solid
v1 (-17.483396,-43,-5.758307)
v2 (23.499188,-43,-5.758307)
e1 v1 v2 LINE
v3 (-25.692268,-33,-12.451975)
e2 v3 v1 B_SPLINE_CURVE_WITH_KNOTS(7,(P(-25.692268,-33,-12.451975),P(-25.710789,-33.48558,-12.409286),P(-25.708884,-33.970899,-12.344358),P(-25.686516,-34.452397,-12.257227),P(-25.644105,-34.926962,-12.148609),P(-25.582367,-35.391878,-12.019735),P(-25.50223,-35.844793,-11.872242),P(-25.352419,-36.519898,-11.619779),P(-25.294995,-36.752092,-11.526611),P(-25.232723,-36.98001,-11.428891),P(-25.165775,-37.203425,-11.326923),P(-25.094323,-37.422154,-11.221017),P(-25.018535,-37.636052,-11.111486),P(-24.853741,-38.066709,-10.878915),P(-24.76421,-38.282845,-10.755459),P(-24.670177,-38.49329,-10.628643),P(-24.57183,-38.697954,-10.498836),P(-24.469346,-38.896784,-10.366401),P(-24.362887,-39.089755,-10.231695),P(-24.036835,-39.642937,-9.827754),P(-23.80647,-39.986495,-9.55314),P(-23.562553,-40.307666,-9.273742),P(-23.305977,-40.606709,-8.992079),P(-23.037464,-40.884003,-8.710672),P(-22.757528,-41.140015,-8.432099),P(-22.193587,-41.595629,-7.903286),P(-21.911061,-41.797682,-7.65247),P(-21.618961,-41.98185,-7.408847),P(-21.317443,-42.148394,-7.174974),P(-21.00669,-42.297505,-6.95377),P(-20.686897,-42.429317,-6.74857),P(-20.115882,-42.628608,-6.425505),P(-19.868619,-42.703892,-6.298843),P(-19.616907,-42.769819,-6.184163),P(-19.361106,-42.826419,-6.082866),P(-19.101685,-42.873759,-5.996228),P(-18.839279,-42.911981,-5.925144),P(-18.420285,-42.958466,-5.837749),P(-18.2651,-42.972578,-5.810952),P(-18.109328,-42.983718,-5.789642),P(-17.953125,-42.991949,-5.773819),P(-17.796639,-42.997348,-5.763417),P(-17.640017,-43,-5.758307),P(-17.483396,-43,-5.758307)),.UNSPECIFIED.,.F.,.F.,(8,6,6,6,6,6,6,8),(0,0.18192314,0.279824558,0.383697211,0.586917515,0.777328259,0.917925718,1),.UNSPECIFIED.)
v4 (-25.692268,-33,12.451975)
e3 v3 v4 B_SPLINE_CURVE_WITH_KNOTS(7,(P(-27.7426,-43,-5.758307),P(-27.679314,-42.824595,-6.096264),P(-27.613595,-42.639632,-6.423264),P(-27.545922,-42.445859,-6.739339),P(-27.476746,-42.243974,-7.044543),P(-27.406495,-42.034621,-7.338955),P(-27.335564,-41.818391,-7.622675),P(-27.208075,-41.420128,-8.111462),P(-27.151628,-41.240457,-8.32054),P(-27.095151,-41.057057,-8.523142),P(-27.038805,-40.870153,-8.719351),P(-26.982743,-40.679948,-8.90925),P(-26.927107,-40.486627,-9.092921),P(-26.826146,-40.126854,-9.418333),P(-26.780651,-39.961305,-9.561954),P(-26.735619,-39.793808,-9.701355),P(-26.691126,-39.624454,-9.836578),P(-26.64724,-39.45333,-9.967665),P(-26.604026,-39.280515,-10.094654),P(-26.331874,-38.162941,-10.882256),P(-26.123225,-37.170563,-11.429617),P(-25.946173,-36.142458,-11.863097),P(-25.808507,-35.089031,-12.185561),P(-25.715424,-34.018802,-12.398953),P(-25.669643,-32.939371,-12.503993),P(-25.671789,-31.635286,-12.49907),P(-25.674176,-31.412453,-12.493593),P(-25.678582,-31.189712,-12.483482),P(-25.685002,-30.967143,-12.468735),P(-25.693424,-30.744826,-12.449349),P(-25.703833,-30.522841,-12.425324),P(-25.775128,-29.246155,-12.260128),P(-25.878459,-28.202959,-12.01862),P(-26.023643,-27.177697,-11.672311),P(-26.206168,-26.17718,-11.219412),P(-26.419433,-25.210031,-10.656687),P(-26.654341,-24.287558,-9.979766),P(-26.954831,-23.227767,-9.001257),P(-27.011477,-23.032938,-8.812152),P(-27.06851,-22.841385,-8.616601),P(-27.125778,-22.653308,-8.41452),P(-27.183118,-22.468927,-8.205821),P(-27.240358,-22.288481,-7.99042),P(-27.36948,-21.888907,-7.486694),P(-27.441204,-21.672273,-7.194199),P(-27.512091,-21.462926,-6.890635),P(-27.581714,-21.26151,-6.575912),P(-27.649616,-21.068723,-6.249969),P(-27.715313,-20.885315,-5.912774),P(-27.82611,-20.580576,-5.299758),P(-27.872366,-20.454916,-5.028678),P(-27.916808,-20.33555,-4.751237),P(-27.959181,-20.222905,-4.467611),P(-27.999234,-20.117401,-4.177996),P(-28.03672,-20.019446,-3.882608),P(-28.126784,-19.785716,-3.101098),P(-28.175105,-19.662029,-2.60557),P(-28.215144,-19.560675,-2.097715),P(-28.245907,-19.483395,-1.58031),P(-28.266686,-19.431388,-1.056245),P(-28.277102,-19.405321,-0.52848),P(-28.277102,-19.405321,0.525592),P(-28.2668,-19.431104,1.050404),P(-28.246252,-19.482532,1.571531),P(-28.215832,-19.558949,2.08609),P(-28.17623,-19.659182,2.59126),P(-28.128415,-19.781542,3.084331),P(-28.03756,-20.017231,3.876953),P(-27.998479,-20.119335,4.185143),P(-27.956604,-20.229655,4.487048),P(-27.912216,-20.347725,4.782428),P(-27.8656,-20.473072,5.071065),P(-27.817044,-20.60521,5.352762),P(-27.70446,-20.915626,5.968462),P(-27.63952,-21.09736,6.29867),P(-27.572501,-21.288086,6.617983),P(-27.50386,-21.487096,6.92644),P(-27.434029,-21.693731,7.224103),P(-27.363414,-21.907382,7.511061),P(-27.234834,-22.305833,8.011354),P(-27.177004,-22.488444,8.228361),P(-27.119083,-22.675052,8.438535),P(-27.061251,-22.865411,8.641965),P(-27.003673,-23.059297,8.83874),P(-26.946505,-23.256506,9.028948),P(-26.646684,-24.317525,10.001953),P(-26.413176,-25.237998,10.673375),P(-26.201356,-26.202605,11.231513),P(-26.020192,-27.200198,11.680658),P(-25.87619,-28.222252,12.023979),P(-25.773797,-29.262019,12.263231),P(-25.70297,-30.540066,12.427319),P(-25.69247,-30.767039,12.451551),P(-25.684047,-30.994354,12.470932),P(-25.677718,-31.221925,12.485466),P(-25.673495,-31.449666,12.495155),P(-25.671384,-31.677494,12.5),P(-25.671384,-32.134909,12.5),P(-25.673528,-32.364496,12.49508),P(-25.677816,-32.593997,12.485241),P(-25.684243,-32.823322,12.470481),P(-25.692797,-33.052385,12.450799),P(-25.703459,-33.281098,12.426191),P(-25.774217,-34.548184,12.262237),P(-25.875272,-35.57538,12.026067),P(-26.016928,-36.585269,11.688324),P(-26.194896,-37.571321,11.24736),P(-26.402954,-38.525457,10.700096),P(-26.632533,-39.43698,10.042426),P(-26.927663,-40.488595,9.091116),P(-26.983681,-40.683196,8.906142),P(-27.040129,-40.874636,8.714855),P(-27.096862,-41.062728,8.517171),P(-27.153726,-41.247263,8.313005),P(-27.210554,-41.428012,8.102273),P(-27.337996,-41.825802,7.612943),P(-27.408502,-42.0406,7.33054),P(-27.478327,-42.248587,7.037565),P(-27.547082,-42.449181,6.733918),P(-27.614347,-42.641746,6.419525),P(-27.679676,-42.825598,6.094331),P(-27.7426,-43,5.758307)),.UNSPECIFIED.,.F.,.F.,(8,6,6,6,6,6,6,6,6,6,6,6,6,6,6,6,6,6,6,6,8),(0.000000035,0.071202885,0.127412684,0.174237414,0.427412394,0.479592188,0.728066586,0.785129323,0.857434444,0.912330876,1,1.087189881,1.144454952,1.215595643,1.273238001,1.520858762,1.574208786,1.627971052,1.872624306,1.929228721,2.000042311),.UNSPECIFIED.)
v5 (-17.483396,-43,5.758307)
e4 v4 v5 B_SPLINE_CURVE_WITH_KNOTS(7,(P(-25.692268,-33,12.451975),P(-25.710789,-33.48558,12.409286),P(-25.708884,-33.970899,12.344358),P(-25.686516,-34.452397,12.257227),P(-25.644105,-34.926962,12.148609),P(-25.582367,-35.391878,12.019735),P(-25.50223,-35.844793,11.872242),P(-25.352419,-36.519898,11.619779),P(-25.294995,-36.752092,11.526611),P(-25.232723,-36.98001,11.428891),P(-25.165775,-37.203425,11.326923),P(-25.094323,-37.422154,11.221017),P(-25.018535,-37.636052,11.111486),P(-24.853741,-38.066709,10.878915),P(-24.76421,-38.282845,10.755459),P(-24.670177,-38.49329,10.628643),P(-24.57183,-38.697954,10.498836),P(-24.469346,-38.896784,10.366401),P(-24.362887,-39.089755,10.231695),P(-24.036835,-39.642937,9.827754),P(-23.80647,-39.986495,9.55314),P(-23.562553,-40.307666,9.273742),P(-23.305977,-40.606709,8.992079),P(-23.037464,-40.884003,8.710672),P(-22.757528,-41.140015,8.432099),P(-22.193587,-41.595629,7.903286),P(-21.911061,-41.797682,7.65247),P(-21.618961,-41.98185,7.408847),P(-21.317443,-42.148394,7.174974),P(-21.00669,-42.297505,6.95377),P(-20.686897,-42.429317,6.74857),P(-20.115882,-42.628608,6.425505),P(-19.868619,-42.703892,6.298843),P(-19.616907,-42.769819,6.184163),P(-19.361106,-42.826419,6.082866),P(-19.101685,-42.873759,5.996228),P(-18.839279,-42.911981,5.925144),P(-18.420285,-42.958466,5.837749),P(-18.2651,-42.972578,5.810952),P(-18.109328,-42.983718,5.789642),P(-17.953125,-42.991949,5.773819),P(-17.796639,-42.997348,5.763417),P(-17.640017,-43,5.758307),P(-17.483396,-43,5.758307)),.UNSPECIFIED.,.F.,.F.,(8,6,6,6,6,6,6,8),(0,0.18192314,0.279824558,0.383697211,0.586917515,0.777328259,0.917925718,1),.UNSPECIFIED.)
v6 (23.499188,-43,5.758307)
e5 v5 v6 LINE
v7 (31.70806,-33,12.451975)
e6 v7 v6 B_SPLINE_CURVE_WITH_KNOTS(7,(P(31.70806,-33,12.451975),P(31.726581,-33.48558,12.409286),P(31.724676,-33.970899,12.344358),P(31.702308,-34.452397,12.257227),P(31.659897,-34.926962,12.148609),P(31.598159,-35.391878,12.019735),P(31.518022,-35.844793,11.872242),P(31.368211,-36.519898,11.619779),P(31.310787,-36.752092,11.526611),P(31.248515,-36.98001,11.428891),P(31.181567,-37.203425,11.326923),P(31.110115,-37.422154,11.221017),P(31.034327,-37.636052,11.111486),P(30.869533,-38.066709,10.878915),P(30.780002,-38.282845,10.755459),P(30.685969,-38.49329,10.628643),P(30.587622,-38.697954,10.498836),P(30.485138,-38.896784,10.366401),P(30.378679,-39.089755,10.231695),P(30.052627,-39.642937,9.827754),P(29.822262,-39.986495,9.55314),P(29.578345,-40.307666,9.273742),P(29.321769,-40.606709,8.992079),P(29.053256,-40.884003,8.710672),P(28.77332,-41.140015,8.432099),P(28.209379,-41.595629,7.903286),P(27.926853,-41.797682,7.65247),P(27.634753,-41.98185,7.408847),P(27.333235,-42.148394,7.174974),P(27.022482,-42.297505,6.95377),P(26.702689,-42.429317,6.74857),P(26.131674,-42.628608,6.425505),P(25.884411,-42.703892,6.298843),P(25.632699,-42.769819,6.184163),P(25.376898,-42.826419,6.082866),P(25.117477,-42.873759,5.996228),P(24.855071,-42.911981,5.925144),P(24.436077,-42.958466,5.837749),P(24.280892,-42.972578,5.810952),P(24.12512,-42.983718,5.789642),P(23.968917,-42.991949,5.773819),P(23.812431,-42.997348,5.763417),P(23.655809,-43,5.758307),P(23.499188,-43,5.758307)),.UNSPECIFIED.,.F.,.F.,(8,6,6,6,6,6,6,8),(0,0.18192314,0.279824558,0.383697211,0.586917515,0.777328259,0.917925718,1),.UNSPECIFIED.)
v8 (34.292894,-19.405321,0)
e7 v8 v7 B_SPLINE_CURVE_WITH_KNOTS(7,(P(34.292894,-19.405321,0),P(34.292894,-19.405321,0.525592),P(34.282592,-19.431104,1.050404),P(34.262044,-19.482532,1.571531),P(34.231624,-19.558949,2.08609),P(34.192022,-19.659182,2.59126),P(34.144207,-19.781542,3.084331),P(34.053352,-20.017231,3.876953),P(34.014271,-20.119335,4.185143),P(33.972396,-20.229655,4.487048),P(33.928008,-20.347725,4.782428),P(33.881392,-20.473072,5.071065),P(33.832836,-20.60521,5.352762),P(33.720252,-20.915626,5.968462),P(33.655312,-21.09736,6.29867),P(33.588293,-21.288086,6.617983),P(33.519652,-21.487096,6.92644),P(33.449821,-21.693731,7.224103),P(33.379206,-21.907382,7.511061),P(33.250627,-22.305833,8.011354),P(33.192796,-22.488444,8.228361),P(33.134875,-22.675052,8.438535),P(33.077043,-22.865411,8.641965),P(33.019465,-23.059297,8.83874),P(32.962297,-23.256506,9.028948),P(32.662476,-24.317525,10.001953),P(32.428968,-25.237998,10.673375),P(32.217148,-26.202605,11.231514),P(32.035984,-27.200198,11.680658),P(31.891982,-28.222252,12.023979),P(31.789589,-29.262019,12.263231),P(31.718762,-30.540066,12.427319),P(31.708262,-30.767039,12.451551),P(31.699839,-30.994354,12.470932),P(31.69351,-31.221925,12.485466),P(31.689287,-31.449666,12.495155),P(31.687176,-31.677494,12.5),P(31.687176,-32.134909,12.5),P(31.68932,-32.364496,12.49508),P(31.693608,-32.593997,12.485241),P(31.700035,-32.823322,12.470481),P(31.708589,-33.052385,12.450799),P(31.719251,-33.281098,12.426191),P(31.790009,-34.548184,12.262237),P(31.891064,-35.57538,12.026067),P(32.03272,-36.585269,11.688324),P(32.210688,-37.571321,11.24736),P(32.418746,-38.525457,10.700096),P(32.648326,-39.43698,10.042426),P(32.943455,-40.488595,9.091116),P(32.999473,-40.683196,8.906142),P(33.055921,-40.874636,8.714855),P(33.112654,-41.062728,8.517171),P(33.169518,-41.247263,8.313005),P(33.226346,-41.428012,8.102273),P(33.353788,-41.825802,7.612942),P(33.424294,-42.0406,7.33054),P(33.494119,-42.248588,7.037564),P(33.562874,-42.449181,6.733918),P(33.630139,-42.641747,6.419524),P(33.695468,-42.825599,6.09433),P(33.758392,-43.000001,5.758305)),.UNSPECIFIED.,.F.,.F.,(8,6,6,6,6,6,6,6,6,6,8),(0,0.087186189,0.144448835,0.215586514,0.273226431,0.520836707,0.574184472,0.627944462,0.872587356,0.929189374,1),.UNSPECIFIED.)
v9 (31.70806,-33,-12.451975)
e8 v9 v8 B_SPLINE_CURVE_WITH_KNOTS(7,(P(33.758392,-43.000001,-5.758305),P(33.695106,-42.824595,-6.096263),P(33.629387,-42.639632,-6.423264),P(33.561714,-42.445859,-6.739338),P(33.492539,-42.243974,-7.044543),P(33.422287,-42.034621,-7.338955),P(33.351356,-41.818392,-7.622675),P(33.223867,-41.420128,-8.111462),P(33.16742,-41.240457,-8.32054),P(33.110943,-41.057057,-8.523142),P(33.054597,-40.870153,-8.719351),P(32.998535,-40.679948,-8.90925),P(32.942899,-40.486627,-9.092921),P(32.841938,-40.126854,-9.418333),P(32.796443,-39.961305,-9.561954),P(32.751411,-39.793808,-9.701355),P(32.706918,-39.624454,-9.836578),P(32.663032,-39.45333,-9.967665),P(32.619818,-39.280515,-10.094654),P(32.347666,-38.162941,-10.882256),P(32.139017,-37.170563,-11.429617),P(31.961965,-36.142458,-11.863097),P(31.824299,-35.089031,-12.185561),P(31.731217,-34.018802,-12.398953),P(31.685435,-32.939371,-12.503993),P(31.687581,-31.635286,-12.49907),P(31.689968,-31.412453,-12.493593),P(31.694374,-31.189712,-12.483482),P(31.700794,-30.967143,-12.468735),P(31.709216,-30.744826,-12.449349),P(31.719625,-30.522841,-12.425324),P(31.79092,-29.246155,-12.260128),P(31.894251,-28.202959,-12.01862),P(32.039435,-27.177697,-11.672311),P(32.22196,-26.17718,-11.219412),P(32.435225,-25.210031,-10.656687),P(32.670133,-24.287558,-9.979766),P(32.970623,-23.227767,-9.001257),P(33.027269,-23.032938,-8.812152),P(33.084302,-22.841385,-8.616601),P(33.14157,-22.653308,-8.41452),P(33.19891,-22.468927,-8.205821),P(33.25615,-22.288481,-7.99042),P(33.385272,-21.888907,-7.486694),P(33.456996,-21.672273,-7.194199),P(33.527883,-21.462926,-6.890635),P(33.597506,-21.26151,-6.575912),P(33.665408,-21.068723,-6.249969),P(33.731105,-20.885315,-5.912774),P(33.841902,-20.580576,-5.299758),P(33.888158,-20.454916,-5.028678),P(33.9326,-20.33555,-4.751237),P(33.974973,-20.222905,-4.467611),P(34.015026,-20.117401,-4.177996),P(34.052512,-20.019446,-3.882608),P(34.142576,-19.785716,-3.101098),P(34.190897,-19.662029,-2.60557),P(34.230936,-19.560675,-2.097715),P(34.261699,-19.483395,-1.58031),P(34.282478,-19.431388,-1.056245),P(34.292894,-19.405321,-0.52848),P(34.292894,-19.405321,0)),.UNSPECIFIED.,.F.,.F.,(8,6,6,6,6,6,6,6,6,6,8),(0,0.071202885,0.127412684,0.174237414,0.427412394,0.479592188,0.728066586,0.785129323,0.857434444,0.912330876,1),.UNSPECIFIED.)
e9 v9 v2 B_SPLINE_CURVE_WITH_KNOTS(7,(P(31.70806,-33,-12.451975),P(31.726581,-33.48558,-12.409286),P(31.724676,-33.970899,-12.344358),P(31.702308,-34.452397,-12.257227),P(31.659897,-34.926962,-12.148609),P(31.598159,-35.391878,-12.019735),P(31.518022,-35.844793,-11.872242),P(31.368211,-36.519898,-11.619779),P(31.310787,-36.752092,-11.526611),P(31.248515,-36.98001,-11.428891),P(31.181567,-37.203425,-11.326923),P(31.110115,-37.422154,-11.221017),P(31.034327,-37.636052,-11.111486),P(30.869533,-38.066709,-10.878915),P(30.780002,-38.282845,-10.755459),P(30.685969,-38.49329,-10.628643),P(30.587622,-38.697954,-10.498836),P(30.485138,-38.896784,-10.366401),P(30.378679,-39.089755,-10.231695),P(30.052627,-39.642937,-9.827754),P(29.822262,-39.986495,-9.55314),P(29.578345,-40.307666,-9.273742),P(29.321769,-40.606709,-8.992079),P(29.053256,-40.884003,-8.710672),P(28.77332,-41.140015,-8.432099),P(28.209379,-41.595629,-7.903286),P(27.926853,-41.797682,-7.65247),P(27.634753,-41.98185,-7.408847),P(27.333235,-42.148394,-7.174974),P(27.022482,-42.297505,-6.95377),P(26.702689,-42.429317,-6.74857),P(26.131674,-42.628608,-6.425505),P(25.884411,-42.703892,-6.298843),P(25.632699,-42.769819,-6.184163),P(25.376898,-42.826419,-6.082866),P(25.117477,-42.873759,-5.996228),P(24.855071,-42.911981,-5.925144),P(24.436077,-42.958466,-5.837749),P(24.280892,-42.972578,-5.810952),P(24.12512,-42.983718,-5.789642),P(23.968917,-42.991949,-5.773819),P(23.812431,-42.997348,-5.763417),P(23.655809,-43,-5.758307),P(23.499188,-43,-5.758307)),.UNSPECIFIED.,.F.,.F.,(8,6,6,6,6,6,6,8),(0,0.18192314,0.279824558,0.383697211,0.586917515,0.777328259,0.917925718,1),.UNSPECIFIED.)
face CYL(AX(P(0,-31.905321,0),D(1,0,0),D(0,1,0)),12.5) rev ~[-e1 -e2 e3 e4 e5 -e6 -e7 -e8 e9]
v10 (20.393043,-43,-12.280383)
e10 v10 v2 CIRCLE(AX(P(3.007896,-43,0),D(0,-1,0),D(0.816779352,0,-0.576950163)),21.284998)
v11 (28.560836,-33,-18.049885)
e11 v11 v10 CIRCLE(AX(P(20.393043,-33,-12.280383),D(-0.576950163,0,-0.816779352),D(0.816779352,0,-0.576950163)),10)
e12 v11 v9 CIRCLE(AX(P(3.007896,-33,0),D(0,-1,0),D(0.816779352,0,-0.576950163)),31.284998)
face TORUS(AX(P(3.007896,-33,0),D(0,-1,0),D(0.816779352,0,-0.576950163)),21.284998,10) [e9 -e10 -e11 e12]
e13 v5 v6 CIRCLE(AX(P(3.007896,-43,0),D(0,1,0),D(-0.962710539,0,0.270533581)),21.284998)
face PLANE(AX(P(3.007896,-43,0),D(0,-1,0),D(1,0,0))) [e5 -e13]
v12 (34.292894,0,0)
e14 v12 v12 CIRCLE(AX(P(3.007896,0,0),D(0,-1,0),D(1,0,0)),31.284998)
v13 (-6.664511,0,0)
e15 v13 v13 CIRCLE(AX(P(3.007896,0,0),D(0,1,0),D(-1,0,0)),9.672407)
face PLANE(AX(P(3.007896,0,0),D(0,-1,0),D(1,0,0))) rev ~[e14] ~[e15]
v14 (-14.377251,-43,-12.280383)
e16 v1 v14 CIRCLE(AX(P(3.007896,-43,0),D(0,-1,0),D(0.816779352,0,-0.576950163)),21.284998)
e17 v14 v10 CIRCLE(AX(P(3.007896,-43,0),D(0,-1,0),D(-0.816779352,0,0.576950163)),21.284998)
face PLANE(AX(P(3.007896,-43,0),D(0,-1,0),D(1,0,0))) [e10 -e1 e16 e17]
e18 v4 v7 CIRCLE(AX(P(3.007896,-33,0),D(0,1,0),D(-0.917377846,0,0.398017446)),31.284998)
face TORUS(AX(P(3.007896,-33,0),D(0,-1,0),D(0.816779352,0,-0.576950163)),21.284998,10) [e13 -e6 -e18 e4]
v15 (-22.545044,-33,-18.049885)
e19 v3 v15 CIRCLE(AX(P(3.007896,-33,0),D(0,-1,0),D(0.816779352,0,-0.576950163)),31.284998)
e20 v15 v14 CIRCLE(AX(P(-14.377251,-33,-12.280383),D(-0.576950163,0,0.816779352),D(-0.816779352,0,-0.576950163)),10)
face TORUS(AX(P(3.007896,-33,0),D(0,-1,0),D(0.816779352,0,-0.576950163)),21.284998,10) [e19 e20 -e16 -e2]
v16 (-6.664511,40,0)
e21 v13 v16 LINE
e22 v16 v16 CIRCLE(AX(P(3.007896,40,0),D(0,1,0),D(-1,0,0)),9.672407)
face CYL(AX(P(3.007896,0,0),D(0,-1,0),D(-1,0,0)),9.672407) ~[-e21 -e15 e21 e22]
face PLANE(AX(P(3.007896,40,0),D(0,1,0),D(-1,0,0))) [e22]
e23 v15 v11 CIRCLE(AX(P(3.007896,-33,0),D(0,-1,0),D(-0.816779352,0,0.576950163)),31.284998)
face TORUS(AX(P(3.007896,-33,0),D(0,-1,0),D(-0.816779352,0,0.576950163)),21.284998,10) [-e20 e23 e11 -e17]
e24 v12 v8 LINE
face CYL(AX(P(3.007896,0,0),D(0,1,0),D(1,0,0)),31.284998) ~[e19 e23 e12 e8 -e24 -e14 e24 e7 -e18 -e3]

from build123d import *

# Parameters (mm, degrees)
F0_R        = 31.2849976613
F1_DEPTH    = 43
F2_R        = 12.5
F3_DEPTH    = 40
F4_T3_ANGLE = 250.4726360275
F4_T6_ANGLE = 250.4726360275
F5_R        = 9.6724066991
F6_DEPTH    = 40


# Not quite as in the source:
# - a fillet or chamfer that OpenCascade refuses, or shapes differently, is made with other operations: its cross-section is extruded or revolved along the edge and cut away or added


with BuildPart() as f1:
    # F0 (on Front) → F1 (new body)
    with BuildSketch(Plane.XZ):
        with Locations((3.0078960117, 0)):
            Circle(F0_R)
    extrude(amount=F1_DEPTH)

    # F2 (on Right) → F3 (cut, symmetric)
    with BuildSketch(Plane.YZ):
        with Locations((-31.9053208832, 0)):
            Circle(F2_R)
    extrude(amount=F3_DEPTH, both=True, mode=Mode.SUBTRACT)

    # F4: fillet of radius 10 on 2 edges, made by hand


with BuildPart() as f4_tool1:
    # F4_s2 → F4_t3 (revolve)
    with BuildSketch(Plane(origin=(1.0012428292, 0, 1.4174438647), x_dir=(0, 1, 0), z_dir=(-0.5769501631, 0, -0.8167793517))):
        with BuildLine():
            ThreePointArc((-33, 33.7417850156), (-40.0710678119, 30.8128528275), (-43, 23.7417850156))
            Line((-43, 23.7417850156), (-43, 33.7417850156))
            Line((-43, 33.7417850156), (-33, 33.7417850156))
        make_face()
    revolve(axis=Axis((3.0078960117, -43, 0), (0, -1, 0)), revolution_arc=F4_T3_ANGLE)


with BuildPart() as f4_tool4:
    # F4_s5 → F4_t6 (revolve)
    with BuildSketch(Plane(origin=(1.0012428292, 0, 1.4174438647), x_dir=(0, 1, 0), z_dir=(0.5769501631, 0, 0.8167793517))):
        with BuildLine():
            ThreePointArc((-33, 28.828210307), (-40.0710678119, 25.8992781188), (-43, 18.828210307))
            Line((-43, 18.828210307), (-43, 28.828210307))
            Line((-43, 28.828210307), (-33, 28.828210307))
        make_face()
    revolve(axis=Axis((3.0078960117, -43, 0), (0, -1, 0)), revolution_arc=F4_T6_ANGLE)


with BuildPart() as f1_1:
    add(f1.part)

    # F4_t7: cut F4_tool1, F4_tool4
    add([f4_tool1.part, f4_tool4.part], mode=Mode.SUBTRACT)

    # F5 (on face) → F6 (join)
    with BuildSketch(Plane(origin=(0, 0, 0), x_dir=(-1, 0, 0), z_dir=(0, 1, 0))):
        with Locations((-3.0078960117, 0)):
            Circle(F5_R)
    extrude(amount=F6_DEPTH)


solid = f1_1.part
